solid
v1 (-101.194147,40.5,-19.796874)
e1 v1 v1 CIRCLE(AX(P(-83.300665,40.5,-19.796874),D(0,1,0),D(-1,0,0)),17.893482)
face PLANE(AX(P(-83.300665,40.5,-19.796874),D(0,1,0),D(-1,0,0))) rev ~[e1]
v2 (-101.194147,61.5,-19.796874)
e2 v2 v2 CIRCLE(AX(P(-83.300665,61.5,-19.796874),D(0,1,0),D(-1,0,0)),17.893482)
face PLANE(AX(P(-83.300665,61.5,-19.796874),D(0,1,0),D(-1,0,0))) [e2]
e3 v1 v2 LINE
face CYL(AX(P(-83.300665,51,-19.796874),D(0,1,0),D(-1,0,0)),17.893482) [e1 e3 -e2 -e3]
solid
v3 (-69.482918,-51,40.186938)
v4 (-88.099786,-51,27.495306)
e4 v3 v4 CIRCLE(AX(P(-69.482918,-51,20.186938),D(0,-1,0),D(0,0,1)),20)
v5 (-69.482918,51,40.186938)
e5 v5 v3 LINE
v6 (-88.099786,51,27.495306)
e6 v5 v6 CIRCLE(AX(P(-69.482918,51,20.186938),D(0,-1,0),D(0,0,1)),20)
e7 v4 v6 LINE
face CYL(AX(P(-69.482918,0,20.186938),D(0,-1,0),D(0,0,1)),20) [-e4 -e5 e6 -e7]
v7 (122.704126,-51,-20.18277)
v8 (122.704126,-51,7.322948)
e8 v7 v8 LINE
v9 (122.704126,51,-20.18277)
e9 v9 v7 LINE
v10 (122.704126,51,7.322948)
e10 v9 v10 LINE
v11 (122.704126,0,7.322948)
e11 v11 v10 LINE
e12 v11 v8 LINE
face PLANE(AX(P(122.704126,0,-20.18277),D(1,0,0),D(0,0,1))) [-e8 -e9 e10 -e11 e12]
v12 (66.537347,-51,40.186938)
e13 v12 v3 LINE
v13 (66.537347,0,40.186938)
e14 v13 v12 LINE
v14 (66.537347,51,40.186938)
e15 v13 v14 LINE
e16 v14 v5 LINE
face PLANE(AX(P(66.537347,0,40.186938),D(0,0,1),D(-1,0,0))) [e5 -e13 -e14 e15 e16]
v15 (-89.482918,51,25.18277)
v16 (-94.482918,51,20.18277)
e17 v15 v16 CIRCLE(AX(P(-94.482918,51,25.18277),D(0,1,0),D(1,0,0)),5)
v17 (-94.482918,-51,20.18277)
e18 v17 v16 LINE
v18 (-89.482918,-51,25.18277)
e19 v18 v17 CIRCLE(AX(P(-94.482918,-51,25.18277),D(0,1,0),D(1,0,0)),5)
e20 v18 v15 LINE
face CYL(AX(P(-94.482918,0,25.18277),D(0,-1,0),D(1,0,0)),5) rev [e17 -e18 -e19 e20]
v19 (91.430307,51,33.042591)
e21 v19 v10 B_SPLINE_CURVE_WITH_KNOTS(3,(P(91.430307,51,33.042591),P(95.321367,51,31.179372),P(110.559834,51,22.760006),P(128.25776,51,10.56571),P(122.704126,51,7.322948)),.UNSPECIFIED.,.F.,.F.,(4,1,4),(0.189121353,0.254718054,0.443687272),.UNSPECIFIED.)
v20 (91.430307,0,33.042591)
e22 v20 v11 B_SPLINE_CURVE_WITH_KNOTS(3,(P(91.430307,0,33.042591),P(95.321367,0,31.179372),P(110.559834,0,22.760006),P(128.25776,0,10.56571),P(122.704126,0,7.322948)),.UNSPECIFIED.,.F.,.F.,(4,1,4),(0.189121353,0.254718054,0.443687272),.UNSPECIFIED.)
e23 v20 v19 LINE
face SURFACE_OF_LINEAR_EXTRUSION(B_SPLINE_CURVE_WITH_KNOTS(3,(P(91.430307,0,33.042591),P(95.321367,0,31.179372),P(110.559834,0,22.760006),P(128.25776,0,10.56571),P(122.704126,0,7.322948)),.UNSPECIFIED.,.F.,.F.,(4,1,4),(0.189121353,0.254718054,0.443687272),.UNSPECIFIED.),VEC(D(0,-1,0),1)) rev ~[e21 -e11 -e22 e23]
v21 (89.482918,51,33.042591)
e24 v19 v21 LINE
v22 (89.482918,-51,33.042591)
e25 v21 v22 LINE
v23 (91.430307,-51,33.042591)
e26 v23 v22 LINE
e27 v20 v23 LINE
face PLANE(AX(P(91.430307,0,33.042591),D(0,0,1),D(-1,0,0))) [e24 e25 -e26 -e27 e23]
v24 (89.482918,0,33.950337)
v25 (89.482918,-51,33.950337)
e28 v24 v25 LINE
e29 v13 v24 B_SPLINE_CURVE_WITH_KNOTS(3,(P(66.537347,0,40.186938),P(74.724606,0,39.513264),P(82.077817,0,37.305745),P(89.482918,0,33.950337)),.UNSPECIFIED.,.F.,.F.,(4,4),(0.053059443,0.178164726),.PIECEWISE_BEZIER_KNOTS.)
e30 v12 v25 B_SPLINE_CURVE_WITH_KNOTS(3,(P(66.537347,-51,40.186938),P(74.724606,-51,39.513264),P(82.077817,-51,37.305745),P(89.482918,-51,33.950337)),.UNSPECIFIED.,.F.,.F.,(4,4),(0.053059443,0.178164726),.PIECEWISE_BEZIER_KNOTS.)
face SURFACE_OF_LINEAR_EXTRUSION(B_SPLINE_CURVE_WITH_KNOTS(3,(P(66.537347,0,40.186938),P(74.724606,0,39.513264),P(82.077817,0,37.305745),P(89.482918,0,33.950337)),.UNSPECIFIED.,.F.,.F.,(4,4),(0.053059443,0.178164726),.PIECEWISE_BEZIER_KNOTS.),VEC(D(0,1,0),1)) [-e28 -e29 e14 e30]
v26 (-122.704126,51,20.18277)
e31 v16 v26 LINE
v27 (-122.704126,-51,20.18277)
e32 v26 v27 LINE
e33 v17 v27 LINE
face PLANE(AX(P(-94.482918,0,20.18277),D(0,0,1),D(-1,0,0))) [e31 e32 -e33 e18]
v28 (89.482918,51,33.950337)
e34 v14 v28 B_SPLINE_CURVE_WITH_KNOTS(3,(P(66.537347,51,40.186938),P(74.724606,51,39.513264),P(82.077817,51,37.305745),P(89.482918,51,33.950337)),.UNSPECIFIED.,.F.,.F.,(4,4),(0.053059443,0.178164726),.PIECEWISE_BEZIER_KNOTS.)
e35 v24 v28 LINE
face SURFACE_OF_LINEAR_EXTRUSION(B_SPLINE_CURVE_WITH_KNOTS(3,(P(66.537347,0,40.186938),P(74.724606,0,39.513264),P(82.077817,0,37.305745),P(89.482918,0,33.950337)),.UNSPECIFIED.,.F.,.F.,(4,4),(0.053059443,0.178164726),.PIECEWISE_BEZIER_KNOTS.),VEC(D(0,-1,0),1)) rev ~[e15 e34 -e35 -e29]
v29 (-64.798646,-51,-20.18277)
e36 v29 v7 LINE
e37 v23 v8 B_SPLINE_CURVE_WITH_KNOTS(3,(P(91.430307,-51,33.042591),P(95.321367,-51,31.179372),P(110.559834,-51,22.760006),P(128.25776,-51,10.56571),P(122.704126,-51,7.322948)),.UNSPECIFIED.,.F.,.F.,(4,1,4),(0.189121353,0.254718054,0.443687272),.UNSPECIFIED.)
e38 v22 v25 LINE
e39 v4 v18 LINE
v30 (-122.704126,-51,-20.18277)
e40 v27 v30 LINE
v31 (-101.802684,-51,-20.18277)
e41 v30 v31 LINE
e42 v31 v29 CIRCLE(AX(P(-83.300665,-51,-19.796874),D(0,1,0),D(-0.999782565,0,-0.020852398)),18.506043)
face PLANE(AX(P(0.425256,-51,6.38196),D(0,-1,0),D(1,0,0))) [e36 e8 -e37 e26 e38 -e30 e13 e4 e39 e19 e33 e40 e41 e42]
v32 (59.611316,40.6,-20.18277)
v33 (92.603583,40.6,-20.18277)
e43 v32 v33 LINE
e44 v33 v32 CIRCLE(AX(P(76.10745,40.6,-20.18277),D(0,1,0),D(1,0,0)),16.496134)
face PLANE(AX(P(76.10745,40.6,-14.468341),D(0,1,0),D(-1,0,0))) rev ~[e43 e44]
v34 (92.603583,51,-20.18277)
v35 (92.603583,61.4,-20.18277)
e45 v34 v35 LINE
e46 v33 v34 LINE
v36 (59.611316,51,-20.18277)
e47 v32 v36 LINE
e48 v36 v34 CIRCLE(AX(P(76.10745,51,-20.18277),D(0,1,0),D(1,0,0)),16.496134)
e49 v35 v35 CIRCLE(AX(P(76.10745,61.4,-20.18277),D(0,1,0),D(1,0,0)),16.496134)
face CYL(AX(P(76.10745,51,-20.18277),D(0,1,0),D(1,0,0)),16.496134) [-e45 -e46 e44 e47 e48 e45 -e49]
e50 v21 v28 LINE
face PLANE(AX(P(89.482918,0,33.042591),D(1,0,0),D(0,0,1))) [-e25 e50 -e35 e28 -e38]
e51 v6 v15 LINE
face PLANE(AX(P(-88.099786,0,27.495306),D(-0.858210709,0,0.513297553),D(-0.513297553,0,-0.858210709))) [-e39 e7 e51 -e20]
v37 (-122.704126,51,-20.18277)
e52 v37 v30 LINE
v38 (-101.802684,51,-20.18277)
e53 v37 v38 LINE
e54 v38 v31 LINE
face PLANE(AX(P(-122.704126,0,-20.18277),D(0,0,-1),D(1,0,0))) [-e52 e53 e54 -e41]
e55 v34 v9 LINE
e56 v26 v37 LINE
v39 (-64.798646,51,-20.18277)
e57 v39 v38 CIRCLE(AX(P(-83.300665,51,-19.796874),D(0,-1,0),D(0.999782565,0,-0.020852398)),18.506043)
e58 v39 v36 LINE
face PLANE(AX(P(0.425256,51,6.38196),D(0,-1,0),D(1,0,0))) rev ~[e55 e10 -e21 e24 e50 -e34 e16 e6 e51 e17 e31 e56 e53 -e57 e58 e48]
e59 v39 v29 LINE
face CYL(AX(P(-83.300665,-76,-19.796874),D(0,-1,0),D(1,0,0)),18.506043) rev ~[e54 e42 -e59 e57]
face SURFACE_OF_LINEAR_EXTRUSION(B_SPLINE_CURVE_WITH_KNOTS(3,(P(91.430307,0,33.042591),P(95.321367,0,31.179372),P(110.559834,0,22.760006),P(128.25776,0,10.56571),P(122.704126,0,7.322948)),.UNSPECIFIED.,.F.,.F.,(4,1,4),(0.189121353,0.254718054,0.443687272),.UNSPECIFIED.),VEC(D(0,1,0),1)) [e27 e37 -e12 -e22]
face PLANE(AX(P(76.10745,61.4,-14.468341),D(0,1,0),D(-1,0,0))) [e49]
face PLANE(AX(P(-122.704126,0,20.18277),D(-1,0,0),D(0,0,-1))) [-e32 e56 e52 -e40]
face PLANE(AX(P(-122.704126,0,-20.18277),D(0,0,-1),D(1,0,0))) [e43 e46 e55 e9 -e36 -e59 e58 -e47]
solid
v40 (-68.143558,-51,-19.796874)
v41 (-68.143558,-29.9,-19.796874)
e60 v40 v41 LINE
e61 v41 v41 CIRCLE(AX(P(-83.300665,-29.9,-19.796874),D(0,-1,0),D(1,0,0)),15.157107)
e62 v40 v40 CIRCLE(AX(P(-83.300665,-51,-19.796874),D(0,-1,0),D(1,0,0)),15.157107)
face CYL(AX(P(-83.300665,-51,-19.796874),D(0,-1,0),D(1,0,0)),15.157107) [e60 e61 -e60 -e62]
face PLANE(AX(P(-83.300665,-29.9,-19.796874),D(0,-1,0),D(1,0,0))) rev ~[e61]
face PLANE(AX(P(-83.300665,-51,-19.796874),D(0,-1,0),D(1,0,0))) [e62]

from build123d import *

# Parameters (mm, degrees)
F1_DEPTH  = 51
F3_R      = 18.5060430465
F4_DEPTH  = 127.0010001
F5_R      = 15.1571066155
F6_DEPTH  = 21.1
F10_DEPTH = 10.4
F11_R     = 17.8934815189
F12_DEPTH = 10.5


# Not quite as in the source:
# - the program builds the solid bodies; features that only make, move or delete a surface that nothing else refers to are left out


with BuildPart() as f1:
    # F0 (on Front) → F1 (new body, symmetric)
    with BuildSketch(Plane.XZ):
        with BuildLine():
            Line((-94.4829183817, 20.1827697456), (-122.7041259408, 20.1827697456))
            Line((-122.7041259408, 20.1827697456), (-122.7041259408, -20.1827697456))
            Line((-122.7041259408, -20.1827697456), (122.7041259408, -20.1827697456))
            Line((122.7041259408, -20.1827697456), (122.7041259408, 7.322948426))
            add(Edge.make_bspline(
                [(122.7041259408, 7.322948426), (112.2416987546, 1.2139475694), (-7.7697103098, 23.886095006), (41.1053786314, 39.0712127023), (55.6025840342, 40.1869378984)],
                knots=[0.4436872716, 0.4436872716, 0.4436872716, 0.4436872716, 0.7996841869, 1, 1, 1, 1], degree=3))
            Line((55.6025840342, 40.1869378984), (-69.4829183817, 40.1869378984))
            ThreePointArc((-69.4829183817, 40.1869378984), (-80.7486328998, 36.7121815092), (-88.0997860678, 27.4953055381))
            Line((-88.0997860678, 27.4953055381), (-89.4829183817, 25.1827697456))
            ThreePointArc((-89.4829183817, 25.1827697456), (-90.9473844758, 21.6472358397), (-94.4829183817, 20.1827697456))
        make_face()
        with BuildLine():
            add(Edge.make_bspline(
                [(122.7041259408, 7.322948426), (112.2416987546, 1.2139475694), (-7.7697103098, 23.886095006), (41.1053786314, 39.0712127023), (55.6025840342, 40.1869378984)],
                knots=[0.4436872716, 0.4436872716, 0.4436872716, 0.4436872716, 0.7996841869, 1, 1, 1, 1], degree=3))
            add(Edge.make_bspline(
                [(91.4303071797, 33.0425910673), (95.3213672764, 31.1793724696), (110.5598336265, 22.7600055142), (128.2577602497, 10.5657099904), (122.7041259408, 7.322948426)],
                knots=[0.189121353, 0.189121353, 0.189121353, 0.189121353, 0.2547180537, 0.4436872716, 0.4436872716, 0.4436872716, 0.4436872716], degree=3))
            Line((91.4303071797, 33.0425910673), (89.4829183835, 33.0425910674))
            Line((89.4829183835, 33.0425910674), (89.4829183833, 33.9503373137))
            add(Edge.make_bspline(
                [(66.5373471656, 40.1869378984), (74.7246059451, 39.5132642043), (82.0778170268, 37.3057446954), (89.4829183833, 33.9503373137)],
                knots=[0.0530594435, 0.0530594435, 0.0530594435, 0.0530594435, 0.1781647263, 0.1781647263, 0.1781647263, 0.1781647263], degree=3))
            Line((66.5373471656, 40.1869378984), (55.6025840342, 40.1869378984))
        make_face()
    extrude(amount=F1_DEPTH, both=True)

    # F3 (on offset) → F4 (cut, through all)
    with BuildSketch(Plane.XZ.offset(76)):
        with Locations((-83.3006650209, -19.7968743742)):
            Circle(F3_R)
    extrude(amount=-F4_DEPTH, mode=Mode.SUBTRACT)

    # F9 (on face) → F10 (join, symmetric)
    with BuildSketch(Plane(origin=(0, 51, 0), x_dir=(-1, 0, 0), z_dir=(0, 1, 0))):
        with BuildLine():
            Line((-92.6035834794, -20.1827697456), (-59.6113161798, -20.1827697456))
            ThreePointArc((-59.6113161798, -20.1827697456), (-76.1074498296, -3.6866360958), (-92.6035834794, -20.1827697456))
        make_face()
        with BuildLine():
            ThreePointArc((-92.6035834794, -20.1827697456), (-76.1074498296, -36.6789033954), (-59.6113161798, -20.1827697456))
            Line((-59.6113161798, -20.1827697456), (-92.6035834794, -20.1827697456))
        make_face()
    extrude(amount=F10_DEPTH, both=True)


with BuildPart() as f6:
    # F5 (on face) → F6 (new body)
    with BuildSketch(Plane.XZ.offset(51)):
        with Locations((-83.3006650209, -19.7968743742)):
            Circle(F5_R)
    extrude(amount=-F6_DEPTH)


with BuildPart() as f12:
    # F11 (on face) → F12 (new body, symmetric)
    with BuildSketch(Plane(origin=(0, 51, 0), x_dir=(-1, 0, 0), z_dir=(0, 1, 0))):
        with Locations((83.3006650209, -19.7968743742)):
            Circle(F11_R)
    extrude(amount=F12_DEPTH, both=True)


solid = Compound([f1.part, f6.part, f12.part])
